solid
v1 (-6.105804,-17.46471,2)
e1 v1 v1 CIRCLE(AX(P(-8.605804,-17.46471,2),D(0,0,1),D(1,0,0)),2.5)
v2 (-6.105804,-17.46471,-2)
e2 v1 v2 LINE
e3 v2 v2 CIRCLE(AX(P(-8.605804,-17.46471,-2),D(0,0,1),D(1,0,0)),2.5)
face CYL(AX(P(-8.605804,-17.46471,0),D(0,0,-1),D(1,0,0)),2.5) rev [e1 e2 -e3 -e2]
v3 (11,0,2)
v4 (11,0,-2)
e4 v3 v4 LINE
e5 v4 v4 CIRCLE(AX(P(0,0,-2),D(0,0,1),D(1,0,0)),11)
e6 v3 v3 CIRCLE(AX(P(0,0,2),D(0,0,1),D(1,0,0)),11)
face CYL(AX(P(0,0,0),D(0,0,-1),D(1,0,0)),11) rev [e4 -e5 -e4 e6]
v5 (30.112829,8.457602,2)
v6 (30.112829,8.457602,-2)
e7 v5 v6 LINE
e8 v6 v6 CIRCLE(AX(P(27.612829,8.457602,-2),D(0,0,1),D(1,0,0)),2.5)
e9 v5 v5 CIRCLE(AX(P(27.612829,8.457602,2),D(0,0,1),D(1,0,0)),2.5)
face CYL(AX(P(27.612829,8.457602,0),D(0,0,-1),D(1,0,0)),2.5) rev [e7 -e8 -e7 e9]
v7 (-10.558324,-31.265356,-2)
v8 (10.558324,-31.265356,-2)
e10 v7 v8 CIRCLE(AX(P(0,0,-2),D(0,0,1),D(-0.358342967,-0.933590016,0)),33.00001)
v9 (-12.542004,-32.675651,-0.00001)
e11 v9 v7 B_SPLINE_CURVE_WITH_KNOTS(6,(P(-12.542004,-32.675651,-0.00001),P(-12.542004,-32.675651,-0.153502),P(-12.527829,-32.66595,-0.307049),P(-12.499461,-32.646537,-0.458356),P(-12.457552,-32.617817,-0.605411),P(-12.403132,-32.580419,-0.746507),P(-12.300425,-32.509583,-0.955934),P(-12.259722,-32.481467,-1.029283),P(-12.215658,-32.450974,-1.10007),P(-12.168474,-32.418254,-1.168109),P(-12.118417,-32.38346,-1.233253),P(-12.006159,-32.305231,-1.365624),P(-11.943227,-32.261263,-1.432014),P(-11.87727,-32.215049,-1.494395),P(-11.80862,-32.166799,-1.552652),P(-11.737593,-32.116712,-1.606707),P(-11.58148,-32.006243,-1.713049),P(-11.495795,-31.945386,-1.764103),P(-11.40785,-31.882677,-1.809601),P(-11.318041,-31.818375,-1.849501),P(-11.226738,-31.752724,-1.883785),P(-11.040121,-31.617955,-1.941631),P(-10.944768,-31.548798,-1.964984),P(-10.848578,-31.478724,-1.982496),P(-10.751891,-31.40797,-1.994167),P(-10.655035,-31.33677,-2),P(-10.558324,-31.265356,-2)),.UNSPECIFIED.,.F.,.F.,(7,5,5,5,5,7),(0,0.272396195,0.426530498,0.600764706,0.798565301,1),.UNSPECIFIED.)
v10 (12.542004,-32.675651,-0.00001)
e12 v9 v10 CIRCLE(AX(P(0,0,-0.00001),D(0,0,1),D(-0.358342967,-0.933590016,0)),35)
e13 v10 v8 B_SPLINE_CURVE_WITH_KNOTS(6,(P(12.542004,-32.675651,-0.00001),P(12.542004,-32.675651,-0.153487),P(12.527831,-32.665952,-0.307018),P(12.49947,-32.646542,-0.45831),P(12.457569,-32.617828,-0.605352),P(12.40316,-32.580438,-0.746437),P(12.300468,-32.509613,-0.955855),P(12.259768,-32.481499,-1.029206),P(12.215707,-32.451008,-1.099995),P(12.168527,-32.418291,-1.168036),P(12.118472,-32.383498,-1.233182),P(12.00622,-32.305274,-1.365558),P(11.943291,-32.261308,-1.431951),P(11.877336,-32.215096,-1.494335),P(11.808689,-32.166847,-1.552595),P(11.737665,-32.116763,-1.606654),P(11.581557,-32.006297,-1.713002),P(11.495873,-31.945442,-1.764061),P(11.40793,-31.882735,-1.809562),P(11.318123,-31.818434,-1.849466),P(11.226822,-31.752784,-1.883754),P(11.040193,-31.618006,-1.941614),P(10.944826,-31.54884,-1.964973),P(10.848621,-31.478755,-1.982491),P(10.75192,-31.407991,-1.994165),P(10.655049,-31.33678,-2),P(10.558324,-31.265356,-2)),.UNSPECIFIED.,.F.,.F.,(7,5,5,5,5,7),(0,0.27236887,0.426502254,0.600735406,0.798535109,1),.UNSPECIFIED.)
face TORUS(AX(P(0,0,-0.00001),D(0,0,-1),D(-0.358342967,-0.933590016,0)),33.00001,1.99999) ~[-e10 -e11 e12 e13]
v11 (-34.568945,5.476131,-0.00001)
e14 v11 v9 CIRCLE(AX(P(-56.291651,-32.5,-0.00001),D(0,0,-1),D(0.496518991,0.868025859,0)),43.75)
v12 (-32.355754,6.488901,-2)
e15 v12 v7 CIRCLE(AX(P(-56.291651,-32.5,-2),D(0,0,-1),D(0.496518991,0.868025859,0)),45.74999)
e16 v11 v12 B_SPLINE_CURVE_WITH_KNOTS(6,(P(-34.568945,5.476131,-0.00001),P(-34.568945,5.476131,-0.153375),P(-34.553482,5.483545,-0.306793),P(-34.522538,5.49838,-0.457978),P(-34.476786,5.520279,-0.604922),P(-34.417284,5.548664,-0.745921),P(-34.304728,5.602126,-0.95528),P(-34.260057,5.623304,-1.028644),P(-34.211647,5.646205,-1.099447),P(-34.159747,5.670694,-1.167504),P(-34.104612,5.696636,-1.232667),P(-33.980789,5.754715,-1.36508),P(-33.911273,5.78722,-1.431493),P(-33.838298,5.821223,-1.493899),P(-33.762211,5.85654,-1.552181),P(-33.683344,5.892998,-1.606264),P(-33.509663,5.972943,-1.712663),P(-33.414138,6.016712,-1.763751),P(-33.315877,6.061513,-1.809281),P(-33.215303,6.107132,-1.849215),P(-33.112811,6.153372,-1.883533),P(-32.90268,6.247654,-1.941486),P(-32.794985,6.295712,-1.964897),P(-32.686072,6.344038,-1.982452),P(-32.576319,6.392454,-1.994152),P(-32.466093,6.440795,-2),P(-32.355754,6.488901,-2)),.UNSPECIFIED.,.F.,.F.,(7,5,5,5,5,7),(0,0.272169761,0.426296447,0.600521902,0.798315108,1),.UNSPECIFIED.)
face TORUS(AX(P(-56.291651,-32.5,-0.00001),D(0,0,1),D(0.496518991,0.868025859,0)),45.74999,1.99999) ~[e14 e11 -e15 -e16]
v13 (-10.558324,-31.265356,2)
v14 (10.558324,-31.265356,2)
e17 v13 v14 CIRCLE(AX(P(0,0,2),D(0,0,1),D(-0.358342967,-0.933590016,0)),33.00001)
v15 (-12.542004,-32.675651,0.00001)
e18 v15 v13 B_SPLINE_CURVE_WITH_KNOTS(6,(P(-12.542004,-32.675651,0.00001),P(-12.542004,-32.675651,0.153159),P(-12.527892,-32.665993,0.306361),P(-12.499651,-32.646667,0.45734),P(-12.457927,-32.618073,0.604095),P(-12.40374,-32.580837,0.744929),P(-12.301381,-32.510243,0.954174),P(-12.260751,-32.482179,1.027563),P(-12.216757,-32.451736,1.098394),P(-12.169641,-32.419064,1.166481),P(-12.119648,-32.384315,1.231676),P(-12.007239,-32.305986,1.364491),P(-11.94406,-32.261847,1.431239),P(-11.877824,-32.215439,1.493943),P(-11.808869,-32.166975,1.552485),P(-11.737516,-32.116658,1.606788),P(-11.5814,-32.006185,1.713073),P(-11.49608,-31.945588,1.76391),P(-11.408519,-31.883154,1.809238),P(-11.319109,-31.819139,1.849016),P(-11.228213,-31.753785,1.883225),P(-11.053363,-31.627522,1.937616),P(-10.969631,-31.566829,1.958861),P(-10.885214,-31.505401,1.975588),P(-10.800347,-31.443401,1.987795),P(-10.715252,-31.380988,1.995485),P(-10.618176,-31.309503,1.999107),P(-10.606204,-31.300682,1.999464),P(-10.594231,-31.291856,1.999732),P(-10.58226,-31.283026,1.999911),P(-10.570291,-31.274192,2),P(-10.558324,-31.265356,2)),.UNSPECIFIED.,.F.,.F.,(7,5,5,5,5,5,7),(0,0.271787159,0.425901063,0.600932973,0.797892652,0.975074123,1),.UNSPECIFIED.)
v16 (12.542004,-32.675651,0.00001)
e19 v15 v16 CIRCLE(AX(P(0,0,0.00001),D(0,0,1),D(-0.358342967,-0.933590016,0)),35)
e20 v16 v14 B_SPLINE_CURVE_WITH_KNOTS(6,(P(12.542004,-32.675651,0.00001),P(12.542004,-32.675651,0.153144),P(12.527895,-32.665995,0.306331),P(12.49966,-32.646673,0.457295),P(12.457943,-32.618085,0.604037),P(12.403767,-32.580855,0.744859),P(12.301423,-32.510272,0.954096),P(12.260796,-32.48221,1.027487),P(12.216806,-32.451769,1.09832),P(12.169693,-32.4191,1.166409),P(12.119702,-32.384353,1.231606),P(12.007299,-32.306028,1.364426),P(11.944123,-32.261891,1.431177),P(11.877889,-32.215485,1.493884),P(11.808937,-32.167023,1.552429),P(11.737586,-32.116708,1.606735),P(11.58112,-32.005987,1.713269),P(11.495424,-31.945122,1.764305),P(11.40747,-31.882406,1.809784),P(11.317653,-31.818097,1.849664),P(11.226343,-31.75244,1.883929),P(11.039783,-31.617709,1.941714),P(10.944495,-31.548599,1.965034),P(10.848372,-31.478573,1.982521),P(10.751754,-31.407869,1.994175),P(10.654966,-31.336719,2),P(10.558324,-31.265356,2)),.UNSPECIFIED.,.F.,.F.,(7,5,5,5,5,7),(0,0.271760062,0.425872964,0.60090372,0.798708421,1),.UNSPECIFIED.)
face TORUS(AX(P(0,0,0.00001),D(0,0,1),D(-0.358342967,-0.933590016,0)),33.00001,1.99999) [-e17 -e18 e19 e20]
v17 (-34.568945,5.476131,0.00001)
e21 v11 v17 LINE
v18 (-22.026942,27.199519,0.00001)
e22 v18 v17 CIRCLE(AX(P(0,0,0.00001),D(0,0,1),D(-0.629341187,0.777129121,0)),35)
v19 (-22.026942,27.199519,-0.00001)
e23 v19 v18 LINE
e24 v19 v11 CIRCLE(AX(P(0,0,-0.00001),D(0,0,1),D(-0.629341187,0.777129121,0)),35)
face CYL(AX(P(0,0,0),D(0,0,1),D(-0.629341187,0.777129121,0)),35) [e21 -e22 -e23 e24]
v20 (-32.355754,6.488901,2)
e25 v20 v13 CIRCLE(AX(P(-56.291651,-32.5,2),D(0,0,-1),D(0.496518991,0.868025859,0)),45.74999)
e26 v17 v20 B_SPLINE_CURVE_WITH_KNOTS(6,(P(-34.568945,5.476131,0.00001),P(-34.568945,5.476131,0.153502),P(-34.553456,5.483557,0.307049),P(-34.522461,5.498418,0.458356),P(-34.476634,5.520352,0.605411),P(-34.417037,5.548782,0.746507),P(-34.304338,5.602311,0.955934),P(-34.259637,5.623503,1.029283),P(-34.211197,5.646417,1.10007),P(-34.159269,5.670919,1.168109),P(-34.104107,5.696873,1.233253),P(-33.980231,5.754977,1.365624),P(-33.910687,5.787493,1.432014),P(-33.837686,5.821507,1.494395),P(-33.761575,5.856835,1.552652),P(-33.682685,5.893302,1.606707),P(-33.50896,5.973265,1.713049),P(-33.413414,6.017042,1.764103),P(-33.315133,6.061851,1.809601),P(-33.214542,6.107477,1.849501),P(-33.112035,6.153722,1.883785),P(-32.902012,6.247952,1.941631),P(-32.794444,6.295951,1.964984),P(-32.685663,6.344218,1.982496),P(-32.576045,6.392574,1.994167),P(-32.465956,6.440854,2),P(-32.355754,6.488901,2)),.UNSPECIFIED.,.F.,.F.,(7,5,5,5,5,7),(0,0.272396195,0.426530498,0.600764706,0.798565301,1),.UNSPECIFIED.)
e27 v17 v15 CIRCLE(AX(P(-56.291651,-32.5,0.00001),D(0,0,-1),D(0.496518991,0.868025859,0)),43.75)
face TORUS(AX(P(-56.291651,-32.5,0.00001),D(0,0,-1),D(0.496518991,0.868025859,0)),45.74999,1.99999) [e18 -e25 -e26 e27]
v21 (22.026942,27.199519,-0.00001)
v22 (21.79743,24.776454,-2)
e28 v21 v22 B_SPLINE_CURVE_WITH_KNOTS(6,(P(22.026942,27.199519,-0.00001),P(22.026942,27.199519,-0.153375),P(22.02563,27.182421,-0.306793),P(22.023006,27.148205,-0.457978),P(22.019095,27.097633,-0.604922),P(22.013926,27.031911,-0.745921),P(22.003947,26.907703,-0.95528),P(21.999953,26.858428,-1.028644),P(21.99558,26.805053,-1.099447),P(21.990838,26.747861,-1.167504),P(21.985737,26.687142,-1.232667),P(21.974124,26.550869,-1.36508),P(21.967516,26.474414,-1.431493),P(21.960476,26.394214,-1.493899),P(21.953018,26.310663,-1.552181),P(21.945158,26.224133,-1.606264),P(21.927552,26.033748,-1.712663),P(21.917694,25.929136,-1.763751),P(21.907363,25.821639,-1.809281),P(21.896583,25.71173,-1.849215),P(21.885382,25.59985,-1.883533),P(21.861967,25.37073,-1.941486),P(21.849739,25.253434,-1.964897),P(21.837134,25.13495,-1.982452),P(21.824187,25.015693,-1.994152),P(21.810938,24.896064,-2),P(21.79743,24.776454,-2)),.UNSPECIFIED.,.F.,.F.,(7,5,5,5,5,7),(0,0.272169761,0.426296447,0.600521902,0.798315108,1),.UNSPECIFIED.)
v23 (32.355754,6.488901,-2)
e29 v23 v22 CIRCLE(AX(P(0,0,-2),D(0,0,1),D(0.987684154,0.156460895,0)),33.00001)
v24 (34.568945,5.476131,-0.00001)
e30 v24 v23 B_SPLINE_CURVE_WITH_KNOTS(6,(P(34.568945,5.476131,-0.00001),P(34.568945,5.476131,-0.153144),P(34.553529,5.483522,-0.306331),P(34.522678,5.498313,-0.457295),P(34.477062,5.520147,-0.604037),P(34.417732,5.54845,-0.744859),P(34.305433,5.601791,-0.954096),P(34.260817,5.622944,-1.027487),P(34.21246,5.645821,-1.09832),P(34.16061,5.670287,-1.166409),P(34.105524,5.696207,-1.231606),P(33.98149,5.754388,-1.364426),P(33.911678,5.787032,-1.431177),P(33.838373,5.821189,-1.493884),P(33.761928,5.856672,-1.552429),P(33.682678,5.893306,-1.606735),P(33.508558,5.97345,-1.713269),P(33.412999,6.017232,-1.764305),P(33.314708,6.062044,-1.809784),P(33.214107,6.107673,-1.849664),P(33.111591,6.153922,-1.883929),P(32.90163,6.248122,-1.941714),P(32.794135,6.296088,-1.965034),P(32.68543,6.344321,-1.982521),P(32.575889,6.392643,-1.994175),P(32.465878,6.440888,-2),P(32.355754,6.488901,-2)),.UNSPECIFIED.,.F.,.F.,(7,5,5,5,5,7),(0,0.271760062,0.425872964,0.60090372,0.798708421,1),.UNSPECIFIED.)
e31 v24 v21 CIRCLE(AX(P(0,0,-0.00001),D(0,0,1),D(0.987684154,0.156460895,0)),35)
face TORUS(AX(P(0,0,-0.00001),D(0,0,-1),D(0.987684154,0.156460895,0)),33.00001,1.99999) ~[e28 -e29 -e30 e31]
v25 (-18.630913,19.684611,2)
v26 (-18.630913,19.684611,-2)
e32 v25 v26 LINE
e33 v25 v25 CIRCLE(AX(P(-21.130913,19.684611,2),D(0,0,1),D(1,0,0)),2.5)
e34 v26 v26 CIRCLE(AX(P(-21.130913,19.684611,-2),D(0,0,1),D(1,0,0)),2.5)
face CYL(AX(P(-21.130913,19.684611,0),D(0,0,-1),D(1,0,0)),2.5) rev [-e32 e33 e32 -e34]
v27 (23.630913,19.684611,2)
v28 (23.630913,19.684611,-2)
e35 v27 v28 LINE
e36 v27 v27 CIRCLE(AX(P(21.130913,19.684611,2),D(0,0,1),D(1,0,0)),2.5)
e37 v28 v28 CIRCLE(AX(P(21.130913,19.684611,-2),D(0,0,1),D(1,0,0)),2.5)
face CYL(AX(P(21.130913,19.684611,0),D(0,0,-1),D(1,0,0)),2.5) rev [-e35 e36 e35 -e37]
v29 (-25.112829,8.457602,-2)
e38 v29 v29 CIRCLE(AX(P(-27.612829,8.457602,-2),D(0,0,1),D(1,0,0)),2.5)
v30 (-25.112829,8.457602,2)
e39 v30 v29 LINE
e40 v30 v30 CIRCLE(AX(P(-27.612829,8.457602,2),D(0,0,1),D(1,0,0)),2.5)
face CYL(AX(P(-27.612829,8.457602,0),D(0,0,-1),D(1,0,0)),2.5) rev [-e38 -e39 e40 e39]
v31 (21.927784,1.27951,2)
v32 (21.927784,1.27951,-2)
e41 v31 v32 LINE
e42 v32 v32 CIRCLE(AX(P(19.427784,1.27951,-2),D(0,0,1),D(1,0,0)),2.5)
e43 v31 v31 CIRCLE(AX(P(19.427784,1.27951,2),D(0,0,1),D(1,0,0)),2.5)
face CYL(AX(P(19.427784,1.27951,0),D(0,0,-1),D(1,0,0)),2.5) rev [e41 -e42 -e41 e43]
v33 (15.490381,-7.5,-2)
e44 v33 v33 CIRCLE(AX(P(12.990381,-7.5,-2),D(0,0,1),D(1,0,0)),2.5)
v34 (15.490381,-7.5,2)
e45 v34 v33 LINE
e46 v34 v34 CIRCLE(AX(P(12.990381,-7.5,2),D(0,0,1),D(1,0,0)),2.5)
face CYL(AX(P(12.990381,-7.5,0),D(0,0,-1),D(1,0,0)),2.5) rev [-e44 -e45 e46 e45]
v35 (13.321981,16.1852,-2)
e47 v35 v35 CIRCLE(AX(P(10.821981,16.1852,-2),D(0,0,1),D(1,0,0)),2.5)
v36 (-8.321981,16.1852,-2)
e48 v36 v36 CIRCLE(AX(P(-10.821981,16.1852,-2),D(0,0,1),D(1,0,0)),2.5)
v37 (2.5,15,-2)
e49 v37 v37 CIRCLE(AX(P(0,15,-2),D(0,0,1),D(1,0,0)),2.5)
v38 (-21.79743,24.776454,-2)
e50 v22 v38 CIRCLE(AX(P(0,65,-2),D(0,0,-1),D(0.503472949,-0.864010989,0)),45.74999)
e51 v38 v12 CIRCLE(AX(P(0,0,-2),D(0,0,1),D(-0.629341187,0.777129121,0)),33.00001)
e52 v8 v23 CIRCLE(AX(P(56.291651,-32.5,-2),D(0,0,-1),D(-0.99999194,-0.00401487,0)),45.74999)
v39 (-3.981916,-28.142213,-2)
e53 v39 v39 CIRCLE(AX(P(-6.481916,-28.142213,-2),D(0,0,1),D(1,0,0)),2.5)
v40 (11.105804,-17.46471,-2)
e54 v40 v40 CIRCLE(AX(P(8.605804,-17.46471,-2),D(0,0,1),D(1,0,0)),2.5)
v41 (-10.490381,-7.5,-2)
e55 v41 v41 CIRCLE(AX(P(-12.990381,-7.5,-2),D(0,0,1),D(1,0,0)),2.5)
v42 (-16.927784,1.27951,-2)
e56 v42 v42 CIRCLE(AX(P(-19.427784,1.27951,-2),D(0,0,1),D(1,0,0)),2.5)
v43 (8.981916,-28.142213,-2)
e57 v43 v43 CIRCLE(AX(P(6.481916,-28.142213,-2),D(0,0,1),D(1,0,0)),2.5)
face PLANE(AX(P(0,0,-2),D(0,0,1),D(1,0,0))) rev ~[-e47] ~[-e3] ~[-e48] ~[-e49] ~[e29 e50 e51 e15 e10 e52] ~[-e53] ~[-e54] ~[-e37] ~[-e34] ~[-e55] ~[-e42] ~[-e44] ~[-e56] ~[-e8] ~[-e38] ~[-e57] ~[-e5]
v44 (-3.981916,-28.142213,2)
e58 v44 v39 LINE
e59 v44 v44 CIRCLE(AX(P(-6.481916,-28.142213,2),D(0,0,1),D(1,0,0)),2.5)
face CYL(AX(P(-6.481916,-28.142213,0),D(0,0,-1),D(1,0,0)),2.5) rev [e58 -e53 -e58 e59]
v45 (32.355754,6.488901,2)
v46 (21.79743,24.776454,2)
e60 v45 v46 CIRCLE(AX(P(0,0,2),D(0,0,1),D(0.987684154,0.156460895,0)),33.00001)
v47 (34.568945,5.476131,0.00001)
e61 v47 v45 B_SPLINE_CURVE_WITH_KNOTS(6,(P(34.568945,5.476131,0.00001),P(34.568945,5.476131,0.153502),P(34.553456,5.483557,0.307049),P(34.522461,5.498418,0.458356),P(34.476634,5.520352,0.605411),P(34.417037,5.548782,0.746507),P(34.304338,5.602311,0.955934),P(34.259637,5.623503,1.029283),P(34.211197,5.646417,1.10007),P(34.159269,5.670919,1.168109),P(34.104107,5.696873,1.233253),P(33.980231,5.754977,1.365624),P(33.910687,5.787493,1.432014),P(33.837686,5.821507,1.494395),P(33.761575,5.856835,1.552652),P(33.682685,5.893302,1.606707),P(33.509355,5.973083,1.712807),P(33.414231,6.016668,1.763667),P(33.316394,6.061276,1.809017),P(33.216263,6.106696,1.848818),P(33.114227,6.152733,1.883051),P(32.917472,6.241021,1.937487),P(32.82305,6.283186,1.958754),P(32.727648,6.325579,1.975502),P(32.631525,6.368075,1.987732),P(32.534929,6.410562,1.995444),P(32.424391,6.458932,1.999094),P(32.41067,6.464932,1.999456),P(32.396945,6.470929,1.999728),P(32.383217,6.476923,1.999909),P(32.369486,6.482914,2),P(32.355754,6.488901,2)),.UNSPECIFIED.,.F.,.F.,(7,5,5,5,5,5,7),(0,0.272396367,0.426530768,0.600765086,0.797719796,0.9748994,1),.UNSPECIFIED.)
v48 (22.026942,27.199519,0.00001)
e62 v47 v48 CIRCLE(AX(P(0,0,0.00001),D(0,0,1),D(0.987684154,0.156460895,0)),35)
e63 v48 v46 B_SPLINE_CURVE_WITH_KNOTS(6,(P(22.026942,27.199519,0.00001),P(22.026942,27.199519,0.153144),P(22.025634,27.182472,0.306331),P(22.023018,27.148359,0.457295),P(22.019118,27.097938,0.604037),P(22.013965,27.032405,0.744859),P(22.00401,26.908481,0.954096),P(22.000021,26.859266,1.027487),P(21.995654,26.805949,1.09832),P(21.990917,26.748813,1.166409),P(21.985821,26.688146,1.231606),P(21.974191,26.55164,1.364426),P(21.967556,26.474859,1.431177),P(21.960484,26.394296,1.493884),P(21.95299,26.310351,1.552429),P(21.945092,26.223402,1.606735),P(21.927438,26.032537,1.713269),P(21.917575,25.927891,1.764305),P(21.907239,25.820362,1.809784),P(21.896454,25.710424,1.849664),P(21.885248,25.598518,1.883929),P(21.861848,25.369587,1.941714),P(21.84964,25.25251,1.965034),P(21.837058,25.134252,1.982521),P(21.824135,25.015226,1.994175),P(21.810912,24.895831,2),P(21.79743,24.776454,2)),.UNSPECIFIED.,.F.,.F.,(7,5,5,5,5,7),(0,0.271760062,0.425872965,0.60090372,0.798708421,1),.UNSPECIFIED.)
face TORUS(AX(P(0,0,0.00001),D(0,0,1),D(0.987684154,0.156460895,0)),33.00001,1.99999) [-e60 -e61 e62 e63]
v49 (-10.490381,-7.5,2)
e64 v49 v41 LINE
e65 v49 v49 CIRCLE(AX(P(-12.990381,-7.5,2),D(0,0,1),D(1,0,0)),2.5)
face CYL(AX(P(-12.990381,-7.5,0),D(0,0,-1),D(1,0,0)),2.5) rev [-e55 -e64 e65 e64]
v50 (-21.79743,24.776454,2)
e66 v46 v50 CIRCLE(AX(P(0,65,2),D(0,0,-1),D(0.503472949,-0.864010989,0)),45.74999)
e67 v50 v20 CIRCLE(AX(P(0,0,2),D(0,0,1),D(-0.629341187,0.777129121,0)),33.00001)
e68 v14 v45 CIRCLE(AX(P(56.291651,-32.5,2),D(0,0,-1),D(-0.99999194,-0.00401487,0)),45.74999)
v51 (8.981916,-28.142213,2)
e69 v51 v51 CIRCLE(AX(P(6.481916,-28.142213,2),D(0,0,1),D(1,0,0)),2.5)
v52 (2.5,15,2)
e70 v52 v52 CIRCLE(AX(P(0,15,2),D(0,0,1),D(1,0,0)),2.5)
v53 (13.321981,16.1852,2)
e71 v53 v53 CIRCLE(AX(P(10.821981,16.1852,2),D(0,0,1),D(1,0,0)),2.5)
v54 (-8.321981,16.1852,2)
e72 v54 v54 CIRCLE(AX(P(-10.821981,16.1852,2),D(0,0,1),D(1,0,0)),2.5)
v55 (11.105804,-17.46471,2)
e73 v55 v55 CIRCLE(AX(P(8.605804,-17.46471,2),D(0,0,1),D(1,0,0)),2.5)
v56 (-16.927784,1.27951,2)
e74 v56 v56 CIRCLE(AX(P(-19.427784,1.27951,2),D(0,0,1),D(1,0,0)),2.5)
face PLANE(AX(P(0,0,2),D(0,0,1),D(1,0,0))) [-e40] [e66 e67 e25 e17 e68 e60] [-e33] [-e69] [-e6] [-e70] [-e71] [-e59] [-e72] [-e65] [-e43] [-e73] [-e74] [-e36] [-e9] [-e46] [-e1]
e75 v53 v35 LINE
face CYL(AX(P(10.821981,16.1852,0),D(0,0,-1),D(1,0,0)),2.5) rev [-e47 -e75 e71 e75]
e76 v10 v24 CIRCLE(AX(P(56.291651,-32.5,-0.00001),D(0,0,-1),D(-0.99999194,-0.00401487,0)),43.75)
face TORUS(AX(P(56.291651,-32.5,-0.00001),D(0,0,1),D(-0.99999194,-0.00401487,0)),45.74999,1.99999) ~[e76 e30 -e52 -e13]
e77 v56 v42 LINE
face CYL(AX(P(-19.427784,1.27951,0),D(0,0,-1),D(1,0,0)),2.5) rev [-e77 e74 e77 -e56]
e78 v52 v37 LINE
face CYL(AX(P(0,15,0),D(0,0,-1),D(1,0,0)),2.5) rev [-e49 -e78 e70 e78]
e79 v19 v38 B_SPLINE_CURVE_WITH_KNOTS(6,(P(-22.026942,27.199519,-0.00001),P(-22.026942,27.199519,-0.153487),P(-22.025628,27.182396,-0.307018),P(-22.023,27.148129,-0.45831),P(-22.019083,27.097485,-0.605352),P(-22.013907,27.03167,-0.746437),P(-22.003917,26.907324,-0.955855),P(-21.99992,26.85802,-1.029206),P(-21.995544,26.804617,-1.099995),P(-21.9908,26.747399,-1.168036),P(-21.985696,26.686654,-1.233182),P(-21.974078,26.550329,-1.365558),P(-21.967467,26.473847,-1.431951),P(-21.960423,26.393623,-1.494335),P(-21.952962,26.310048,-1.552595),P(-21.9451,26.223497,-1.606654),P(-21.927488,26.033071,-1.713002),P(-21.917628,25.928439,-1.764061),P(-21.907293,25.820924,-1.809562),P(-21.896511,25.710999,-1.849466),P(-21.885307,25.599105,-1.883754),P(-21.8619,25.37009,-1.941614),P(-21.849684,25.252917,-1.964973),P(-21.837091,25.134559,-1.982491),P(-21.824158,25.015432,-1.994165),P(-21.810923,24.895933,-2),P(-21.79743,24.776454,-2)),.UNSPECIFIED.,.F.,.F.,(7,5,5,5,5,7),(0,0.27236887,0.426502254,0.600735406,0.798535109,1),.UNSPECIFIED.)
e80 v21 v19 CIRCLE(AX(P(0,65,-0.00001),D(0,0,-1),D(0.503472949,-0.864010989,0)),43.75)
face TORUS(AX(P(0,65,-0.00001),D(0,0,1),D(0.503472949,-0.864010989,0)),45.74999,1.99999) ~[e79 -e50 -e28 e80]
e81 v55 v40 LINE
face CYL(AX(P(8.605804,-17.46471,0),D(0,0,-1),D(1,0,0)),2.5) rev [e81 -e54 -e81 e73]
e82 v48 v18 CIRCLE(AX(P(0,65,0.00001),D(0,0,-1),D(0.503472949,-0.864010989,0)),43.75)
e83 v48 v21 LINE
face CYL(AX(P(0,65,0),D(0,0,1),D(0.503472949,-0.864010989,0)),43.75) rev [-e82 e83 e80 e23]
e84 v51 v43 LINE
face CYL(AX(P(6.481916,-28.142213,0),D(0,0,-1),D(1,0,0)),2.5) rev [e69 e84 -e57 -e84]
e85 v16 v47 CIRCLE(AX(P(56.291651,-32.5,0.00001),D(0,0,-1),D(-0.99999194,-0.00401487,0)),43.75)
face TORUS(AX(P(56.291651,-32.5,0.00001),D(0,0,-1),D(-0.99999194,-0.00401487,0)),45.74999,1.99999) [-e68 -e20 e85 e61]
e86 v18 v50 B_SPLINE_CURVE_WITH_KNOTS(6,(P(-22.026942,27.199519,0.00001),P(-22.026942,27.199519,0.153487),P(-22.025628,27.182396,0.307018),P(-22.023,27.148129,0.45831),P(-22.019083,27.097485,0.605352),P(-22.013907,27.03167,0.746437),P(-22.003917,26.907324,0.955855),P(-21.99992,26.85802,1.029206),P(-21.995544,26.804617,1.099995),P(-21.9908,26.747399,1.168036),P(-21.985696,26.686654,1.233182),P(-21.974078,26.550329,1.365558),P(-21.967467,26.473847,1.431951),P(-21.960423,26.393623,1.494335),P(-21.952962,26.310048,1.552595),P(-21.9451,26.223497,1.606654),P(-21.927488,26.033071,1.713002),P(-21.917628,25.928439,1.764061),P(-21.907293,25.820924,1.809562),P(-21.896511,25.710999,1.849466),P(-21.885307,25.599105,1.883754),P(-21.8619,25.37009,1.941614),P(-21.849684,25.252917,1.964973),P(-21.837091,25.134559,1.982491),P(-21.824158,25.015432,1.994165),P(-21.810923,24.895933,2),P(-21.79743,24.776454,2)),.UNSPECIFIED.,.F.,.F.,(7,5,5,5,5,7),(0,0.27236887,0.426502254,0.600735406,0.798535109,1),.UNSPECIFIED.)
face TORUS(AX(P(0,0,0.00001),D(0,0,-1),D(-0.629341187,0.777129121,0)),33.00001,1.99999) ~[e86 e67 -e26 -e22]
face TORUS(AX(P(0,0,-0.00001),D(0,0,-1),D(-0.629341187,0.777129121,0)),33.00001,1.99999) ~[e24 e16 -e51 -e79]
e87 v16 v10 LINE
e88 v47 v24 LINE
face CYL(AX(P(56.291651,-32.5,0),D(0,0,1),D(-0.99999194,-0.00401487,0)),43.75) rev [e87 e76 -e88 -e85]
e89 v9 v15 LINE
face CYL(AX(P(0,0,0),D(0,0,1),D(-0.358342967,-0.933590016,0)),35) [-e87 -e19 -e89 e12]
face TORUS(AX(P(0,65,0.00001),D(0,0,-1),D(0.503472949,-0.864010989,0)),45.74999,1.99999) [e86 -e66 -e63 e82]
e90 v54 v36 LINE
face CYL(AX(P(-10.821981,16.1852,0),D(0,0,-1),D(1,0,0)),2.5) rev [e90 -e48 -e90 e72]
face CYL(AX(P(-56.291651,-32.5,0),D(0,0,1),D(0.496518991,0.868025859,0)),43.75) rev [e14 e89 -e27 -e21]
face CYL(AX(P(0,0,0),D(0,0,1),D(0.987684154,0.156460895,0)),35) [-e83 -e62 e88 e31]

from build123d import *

# Parameters (mm, degrees)
F0_R     = 2.5
F0_R_2   = 11
F1_DEPTH = 2
F2_R     = 1.99999


# Not quite as in the source:
# - a fillet or chamfer is up to 0.001 mm smaller than in the source, because OpenCascade refuses the exact size


with BuildPart() as f1:
    # F0 (on Top) → F1 (new body, symmetric)
    with BuildSketch(Plane.XY):
        with BuildLine():
            ThreePointArc((22.0269415402, 27.1995192308), (0, 21.25), (-22.0269415402, 27.1995192308))
            ThreePointArc((-22.0269415402, 27.1995192308), (-30.3108891325, 17.5), (-34.5689453947, 5.4761313261))
            ThreePointArc((-34.5689453947, 5.4761313261), (-18.4030398304, -10.625), (-12.5420038545, -32.6756505569))
            ThreePointArc((-12.5420038545, -32.6756505569), (0, -35), (12.5420038545, -32.6756505569))
            ThreePointArc((12.5420038545, -32.6756505569), (18.4030398304, -10.625), (34.5689453947, 5.4761313261))
            ThreePointArc((34.5689453947, 5.4761313261), (30.3108891325, 17.5), (22.0269415402, 27.1995192308))
        make_face()
        with Locations((-6.4819163414, -28.1422128626)):
            Circle(F0_R, mode=Mode.SUBTRACT)
        with Locations((-8.6058037086, -17.4647100248)):
            Circle(F0_R, mode=Mode.SUBTRACT)
        with Locations((-12.9903810568, -7.5)):
            Circle(F0_R, mode=Mode.SUBTRACT)
        with Locations((6.4819163414, -28.1422128626)):
            Circle(F0_R, mode=Mode.SUBTRACT)
        with Locations((8.6058037086, -17.4647100248)):
            Circle(F0_R, mode=Mode.SUBTRACT)
        with Locations((12.9903810568, -7.5)):
            Circle(F0_R, mode=Mode.SUBTRACT)
        with Locations((-19.4277844055, 1.2795103808)):
            Circle(F0_R, mode=Mode.SUBTRACT)
        with Locations((-27.6128294284, 8.4576022144)):
            Circle(F0_R, mode=Mode.SUBTRACT)
        with Locations((-21.130913087, 19.6846106482)):
            Circle(F0_R, mode=Mode.SUBTRACT)
        with Locations((-10.8219806969, 16.185199644)):
            Circle(F0_R, mode=Mode.SUBTRACT)
        Circle(F0_R_2, mode=Mode.SUBTRACT)
        with Locations((19.4277844055, 1.2795103808)):
            Circle(F0_R, mode=Mode.SUBTRACT)
        with Locations((27.6128294284, 8.4576022144)):
            Circle(F0_R, mode=Mode.SUBTRACT)
        with Locations((0, 15)):
            Circle(F0_R, mode=Mode.SUBTRACT)
        with Locations((10.8219806969, 16.185199644)):
            Circle(F0_R, mode=Mode.SUBTRACT)
        with Locations((21.130913087, 19.6846106482)):
            Circle(F0_R, mode=Mode.SUBTRACT)
    extrude(amount=F1_DEPTH, both=True)

    # F2 (radius 2 in the source; OpenCascade refuses exactly that, so slightly less here)
    f2_edges = [f1.edges().sort_by_distance(p)[0] for p in [
        (0, -35, 2),
        (-18.40304, -10.625, 2),
        (30.310889, 17.5, 2),
        (-18.40304, -10.625, -2),
        (0, 21.25, -2),
        (0, 21.25, 2),
        (-30.310889, 17.5, -2),
        (-30.310889, 17.5, 2),
        (30.310889, 17.5, -2),
        (18.40304, -10.625, 2),
        (18.40304, -10.625, -2),
        (0, -35, -2),
    ]]
    fillet(f2_edges, radius=F2_R)


solid = f1.part
